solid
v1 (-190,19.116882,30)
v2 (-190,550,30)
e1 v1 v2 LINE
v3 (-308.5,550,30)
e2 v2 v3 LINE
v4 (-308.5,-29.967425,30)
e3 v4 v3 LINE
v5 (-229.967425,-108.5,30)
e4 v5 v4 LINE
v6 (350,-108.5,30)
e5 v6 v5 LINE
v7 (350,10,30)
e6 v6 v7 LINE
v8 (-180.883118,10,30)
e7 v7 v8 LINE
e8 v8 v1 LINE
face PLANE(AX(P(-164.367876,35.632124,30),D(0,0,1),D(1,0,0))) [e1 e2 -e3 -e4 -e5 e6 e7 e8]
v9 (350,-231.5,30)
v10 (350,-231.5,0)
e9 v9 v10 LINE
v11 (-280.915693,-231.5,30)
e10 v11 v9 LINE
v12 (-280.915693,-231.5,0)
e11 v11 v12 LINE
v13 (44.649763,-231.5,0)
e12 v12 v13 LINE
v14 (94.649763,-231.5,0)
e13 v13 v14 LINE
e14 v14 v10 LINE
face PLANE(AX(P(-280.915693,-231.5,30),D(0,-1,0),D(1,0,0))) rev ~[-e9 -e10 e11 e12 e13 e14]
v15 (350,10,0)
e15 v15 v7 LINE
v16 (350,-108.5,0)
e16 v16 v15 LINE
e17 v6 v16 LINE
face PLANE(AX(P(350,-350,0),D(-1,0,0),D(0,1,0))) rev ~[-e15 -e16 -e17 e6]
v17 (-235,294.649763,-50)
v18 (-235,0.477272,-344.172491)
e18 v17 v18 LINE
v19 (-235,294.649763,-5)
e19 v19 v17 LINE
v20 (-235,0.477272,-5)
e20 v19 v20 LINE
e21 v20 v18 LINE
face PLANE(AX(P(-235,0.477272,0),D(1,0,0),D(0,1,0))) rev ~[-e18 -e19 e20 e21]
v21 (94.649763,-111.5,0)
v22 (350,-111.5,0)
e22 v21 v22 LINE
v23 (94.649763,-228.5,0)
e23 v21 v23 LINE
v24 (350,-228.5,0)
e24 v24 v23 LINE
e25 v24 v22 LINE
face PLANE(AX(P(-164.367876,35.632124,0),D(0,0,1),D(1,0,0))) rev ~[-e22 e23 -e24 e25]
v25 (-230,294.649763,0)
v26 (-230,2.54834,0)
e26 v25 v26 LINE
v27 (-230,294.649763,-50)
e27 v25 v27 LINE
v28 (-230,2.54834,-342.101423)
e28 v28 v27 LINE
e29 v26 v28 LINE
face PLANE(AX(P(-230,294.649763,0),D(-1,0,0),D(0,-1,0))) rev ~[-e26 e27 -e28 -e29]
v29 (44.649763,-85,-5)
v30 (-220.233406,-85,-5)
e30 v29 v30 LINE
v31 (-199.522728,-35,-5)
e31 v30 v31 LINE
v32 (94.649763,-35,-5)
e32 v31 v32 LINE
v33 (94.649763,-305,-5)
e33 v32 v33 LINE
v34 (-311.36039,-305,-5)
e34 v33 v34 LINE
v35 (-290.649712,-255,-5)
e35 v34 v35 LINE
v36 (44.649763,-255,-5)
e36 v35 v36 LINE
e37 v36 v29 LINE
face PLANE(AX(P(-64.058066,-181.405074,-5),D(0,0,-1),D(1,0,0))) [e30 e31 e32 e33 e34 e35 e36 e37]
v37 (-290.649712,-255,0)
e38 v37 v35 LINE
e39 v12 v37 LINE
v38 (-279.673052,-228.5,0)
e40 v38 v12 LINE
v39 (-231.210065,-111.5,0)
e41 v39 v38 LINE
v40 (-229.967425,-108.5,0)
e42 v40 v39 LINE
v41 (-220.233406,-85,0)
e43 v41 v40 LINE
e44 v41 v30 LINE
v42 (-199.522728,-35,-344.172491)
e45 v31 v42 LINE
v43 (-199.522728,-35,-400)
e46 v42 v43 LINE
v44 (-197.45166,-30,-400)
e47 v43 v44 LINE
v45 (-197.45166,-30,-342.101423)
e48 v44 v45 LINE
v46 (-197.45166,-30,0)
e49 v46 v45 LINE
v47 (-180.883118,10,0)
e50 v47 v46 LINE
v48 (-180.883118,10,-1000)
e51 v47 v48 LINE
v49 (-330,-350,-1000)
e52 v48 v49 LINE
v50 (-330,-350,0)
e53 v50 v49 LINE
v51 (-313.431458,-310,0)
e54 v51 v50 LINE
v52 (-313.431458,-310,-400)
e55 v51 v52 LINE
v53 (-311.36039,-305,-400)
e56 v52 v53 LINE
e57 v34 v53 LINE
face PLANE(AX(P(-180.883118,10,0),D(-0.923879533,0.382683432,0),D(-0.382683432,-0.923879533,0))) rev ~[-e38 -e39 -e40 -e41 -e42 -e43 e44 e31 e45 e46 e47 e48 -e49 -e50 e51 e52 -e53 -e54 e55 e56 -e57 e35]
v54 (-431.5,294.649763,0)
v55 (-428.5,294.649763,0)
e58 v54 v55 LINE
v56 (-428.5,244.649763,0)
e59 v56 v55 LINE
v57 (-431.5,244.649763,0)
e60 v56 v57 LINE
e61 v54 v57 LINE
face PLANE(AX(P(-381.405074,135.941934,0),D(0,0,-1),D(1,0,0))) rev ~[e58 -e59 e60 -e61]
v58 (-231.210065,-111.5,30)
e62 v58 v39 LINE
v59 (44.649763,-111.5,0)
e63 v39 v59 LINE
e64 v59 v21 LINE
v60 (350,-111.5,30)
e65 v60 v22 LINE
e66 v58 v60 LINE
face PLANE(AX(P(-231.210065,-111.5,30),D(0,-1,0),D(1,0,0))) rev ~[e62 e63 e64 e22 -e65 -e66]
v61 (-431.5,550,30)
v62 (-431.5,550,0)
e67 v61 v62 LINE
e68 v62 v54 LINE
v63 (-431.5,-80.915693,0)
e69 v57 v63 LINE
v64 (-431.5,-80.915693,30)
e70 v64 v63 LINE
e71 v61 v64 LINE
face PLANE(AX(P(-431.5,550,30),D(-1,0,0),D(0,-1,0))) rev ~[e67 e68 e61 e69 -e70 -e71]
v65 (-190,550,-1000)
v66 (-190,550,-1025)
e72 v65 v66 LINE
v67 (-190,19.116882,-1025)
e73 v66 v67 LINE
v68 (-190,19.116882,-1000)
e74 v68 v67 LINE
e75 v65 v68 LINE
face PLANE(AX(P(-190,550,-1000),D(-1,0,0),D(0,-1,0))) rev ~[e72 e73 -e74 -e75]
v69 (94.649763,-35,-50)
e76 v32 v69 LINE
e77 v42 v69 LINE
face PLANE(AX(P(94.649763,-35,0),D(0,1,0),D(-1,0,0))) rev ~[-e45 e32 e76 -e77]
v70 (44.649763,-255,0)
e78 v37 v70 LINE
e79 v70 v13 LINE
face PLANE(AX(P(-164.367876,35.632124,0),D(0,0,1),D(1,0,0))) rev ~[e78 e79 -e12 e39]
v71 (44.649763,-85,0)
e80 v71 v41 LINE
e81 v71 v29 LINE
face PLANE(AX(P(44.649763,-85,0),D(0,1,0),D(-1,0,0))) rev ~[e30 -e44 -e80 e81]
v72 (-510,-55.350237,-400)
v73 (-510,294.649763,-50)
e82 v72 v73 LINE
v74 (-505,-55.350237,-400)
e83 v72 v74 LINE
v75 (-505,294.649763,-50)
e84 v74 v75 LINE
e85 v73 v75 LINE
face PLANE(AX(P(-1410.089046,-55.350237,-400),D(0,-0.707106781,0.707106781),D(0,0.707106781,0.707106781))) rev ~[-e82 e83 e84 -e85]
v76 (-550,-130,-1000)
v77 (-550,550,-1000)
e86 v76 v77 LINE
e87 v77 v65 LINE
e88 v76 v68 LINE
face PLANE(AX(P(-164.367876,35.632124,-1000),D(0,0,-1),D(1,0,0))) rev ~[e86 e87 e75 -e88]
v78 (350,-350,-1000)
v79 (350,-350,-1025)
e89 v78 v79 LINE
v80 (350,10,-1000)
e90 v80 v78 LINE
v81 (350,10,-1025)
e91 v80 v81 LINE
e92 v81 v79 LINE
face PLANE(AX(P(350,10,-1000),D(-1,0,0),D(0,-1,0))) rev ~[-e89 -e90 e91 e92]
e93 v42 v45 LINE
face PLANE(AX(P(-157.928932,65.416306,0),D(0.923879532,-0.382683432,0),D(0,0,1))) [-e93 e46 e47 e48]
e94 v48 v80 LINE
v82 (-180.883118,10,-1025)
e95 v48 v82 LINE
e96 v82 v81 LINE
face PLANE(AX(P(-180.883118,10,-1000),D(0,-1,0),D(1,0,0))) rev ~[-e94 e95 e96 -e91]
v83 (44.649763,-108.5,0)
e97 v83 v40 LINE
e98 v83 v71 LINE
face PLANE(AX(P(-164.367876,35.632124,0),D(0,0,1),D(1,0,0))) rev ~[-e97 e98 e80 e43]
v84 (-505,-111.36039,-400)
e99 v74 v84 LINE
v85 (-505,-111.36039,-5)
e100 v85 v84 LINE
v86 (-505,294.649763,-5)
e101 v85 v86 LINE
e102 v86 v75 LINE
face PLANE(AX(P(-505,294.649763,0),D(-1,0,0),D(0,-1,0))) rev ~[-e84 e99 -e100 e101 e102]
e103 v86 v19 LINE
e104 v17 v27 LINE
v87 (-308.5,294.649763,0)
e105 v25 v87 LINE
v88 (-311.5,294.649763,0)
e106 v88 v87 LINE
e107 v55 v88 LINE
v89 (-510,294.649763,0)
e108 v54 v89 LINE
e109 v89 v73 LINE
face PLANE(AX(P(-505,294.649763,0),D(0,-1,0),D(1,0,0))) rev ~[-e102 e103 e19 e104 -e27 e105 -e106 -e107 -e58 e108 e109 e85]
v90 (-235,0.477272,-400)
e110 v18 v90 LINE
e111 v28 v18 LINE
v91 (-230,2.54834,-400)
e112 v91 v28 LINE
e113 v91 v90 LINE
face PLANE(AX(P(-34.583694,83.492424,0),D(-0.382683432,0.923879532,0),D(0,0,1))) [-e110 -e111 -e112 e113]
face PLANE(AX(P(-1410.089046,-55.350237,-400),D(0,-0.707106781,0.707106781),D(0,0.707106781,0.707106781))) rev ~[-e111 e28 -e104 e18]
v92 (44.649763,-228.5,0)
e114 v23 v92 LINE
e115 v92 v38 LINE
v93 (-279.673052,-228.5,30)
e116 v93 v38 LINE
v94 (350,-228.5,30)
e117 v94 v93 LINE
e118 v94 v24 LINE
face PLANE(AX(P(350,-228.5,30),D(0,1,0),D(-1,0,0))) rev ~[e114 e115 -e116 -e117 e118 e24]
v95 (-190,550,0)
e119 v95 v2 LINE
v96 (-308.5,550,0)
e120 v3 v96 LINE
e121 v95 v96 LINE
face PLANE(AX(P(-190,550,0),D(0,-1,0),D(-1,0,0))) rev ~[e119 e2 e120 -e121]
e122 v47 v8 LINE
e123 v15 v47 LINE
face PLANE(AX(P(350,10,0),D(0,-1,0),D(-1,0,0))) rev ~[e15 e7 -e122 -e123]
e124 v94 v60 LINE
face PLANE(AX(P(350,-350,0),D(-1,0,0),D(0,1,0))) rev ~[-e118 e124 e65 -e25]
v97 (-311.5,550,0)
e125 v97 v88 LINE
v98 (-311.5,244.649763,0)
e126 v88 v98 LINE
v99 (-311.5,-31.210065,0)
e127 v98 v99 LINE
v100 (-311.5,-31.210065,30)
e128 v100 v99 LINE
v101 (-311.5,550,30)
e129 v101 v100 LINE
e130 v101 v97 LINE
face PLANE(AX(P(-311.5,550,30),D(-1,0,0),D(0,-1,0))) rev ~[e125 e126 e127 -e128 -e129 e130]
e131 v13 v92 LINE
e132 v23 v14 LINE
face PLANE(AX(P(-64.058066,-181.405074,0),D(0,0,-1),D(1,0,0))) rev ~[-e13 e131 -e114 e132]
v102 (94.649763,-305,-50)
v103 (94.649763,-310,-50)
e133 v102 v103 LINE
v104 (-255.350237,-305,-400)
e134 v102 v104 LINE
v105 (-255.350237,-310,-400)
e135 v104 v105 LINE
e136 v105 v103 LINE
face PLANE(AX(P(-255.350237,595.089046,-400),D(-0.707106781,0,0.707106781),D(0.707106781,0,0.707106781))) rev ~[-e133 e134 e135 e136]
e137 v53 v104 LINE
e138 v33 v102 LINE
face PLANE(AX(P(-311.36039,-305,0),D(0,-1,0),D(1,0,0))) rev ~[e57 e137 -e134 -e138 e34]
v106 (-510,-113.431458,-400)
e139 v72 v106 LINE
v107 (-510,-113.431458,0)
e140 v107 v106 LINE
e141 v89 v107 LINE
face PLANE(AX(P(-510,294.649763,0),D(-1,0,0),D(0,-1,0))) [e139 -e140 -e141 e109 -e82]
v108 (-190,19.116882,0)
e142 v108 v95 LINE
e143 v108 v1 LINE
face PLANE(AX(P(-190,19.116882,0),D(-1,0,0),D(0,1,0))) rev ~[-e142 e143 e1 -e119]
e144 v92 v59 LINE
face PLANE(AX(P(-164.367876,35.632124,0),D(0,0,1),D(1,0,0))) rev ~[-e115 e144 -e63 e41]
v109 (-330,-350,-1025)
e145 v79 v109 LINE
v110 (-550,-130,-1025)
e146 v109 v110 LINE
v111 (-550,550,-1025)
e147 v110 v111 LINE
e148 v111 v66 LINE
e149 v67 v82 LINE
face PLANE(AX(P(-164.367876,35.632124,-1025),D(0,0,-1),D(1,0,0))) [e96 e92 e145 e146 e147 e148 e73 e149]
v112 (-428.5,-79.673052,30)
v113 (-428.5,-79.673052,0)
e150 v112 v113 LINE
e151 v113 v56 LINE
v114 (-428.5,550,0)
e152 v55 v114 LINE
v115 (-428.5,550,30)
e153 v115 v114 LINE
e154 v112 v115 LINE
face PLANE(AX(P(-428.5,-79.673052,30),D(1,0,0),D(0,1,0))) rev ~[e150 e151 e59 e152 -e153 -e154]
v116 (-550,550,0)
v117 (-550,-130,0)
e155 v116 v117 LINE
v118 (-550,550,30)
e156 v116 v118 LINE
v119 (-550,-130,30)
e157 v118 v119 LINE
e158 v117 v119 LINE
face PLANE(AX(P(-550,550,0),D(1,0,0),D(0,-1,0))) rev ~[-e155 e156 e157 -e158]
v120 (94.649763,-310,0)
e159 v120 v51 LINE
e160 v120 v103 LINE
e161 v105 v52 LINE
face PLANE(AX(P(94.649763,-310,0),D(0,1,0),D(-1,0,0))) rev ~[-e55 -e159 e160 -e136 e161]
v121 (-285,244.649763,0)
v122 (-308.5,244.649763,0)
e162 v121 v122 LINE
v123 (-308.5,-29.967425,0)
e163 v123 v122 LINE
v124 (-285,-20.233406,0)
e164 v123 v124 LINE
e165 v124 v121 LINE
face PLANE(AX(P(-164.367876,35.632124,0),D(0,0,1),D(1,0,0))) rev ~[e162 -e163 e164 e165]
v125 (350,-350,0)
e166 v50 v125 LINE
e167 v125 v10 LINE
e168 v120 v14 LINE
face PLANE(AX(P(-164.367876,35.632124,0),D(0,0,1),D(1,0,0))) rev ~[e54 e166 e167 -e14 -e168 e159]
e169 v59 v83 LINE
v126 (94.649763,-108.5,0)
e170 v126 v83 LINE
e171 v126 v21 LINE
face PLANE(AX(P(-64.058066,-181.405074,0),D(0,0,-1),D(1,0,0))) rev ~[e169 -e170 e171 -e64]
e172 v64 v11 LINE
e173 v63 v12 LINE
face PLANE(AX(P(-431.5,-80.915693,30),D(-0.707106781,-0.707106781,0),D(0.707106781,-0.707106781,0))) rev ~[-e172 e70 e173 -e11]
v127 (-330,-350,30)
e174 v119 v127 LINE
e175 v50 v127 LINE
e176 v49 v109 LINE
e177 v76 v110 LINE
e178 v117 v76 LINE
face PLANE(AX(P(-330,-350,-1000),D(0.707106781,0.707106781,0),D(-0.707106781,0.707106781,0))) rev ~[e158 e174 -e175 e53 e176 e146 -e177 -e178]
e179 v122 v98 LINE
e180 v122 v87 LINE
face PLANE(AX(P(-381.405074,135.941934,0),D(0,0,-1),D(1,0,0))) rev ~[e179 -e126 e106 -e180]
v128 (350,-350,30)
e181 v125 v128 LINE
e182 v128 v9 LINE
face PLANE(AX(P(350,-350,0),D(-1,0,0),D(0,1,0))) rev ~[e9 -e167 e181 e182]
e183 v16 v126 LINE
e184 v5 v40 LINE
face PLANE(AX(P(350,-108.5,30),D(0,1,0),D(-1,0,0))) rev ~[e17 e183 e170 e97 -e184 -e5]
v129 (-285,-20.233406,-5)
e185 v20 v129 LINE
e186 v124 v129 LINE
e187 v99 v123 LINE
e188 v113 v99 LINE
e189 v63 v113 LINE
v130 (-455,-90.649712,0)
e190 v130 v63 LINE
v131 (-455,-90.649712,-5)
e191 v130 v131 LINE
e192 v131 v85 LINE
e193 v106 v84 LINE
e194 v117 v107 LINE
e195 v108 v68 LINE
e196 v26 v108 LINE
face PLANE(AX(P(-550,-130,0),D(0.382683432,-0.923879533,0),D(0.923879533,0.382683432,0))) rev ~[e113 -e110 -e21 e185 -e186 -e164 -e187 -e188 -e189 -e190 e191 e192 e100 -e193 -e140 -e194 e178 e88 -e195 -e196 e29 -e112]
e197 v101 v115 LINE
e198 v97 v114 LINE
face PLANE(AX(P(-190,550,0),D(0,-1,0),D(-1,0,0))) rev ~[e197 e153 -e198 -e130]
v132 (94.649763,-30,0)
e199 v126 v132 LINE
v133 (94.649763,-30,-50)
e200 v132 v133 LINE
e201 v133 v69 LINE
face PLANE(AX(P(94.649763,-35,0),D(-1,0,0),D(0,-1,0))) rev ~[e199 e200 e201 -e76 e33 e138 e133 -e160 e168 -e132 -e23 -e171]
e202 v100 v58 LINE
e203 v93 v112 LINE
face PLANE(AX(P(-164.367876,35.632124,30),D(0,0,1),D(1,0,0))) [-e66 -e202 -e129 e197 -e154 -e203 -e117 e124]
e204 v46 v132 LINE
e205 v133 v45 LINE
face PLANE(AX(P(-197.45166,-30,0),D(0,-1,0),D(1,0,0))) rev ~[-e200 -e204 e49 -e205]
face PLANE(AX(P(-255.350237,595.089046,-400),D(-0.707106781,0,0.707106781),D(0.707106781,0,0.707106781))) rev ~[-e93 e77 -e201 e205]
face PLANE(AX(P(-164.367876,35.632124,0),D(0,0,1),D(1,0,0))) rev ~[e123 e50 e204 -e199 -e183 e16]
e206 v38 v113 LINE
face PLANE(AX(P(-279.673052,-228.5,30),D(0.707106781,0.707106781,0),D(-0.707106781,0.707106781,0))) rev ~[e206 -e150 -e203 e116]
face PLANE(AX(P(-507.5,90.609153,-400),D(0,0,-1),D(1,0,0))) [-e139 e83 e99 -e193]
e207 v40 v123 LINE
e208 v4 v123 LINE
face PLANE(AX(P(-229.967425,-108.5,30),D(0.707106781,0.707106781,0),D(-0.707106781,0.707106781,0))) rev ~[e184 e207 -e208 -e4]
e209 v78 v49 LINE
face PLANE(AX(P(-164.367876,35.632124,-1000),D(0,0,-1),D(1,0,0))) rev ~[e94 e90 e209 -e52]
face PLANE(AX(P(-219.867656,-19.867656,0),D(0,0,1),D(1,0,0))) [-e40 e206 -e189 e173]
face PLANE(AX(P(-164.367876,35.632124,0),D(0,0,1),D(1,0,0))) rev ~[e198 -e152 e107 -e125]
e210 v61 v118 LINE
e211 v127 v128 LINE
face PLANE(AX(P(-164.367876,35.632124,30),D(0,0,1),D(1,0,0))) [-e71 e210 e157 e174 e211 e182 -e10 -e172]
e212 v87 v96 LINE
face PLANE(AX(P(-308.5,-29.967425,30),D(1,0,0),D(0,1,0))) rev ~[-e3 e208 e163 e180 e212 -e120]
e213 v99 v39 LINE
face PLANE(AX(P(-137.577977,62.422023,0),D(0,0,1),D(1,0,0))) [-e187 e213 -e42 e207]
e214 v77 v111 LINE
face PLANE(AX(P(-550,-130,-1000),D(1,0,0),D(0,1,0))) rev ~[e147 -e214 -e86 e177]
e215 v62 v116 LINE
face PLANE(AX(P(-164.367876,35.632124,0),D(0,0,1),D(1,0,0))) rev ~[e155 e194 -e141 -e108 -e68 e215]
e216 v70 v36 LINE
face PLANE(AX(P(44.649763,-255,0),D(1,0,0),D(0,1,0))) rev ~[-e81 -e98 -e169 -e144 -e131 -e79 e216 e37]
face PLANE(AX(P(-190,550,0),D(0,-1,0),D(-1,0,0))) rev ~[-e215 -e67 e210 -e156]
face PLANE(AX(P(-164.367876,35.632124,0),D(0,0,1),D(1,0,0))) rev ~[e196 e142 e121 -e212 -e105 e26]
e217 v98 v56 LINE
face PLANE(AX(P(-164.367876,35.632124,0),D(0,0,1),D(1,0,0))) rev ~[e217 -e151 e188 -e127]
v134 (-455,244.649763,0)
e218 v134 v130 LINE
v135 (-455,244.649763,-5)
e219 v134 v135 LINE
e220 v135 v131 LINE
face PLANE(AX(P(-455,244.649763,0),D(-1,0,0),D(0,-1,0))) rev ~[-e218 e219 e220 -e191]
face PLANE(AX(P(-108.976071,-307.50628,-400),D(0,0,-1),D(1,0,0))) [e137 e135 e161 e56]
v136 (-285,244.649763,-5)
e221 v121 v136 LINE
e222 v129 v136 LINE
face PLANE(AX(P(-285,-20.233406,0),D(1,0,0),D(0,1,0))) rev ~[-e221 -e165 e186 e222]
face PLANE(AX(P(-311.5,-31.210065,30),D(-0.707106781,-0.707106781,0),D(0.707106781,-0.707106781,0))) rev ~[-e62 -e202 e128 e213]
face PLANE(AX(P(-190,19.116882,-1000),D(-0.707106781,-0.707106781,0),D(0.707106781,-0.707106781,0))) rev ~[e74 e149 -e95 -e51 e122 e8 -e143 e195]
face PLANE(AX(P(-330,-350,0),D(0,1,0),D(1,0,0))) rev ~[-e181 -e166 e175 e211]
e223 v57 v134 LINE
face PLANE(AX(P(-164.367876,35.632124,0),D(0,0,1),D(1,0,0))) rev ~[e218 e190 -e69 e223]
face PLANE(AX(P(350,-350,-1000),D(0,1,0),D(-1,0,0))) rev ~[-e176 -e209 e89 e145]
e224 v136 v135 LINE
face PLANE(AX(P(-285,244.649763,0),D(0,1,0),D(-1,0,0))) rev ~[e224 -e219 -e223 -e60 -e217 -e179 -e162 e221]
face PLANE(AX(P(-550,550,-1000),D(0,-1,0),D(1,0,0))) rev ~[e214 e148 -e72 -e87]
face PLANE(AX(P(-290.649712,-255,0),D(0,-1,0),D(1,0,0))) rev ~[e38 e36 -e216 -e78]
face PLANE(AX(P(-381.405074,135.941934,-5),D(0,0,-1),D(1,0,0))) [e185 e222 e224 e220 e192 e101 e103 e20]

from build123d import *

# Parameters (mm, degrees)
F1_DEPTH     = 30
F3_DEPTH     = 1000
F5_DEPTH     = 25
F6_W         = 5
F6_H         = 408.0812203564
F7_DEPTH     = 400
F8_T4_DEPTH  = 1805.1780915761
F8_T10_DEPTH = 1805.1780915761
F8_T16_DEPTH = 1805.1780915761
F8_T22_DEPTH = 1805.1780915761
F8_T28_DEPTH = 1805.1780915761
F8_T34_DEPTH = 1805.1780915761
F8_T40_DEPTH = 1805.1780915761
F8_T46_DEPTH = 1805.1780915761
F8_T52_DEPTH = 1805.1780915761
F8_T58_DEPTH = 1805.1780915761
F8_T64_DEPTH = 1805.1780915761
F8_T70_DEPTH = 1805.1780915761
F12_DEPTH    = 30
F13_DEPTH    = 5


# Not quite as in the source:
# - a fillet or chamfer that OpenCascade refuses, or shapes differently, is made with other operations: its cross-section is extruded or revolved along the edge and cut away or added


with BuildPart() as f1:
    # F0 (on Top) → F1 (new body)
    with BuildSketch(Plane.XY):
        Polygon((-190, 550), (-550, 550), (-550, -130), (-330, -350), (350, -350), (350, 10), (-180.8831175457, 10), (-190, 19.1168824543), align=None)
    extrude(amount=F1_DEPTH)

    # F2 (on face) → F3 (join)
    with BuildSketch(Plane(origin=(0, 0, 0), x_dir=(1, 0, 0), z_dir=(0, 0, -1))):
        Polygon((-330, 350), (-550, 130), (-190, -19.1168824543), (-180.8831175457, -10), align=None)
    extrude(amount=F3_DEPTH)

    # F4 (on face) → F5 (join)
    with BuildSketch(Plane(origin=(0, 0, -1000), x_dir=(1, 0, 0), z_dir=(0, 0, -1))):
        Polygon((350, 350), (-330, 350), (-550, 130), (-550, -550), (-190, -550), (-190, -19.1168824543), (-180.8831175457, -10), (350, -10), align=None)
    extrude(amount=F5_DEPTH)

    # F6 (on face) → F7 (join)
    with BuildSketch(Plane(origin=(0, 0, 0), x_dir=(1, 0, 0), z_dir=(0, 0, -1))):
        Polygon((-311.3603896932, 305), (94.6497628513, 305), (94.6497628513, 310), (-313.4314575051, 310), align=None)
        with Locations((-507.5, -90.6091526731)):
            Rectangle(F6_W, F6_H)
        Polygon((94.6497628513, 30), (94.6497628513, 35), (-199.5227278525, 35), (-197.4516600406, 30), align=None)
        Polygon((-235, -0.4772721475), (-235, -294.6497628513), (-230, -294.6497628513), (-230, -2.5483399594), align=None)
    extrude(amount=F7_DEPTH)

    # F8: chamfer of 350 on 4 edges, made by hand


with BuildPart() as f8_tool2:
    # F8_s3 → F8_t4 (new body)
    with BuildSketch(Plane.YZ.offset(-1410.0890457881)):
        Polygon((-55.3502371487, -400), (294.6497628513, -50), (294.6497628513, -400), align=None)
    extrude(amount=F8_T4_DEPTH)

    split(bisect_by=Plane(origin=(-34.5836943966, 83.4924240492, 0), x_dir=(0, 0, 1), z_dir=(-0.3826834324, 0.9238795325, 0)), keep=Keep.TOP)

    split(bisect_by=Plane(origin=(-157.9289321881, 65.4163056034, 0), x_dir=(0, 0, 1), z_dir=(-0.9238795325, 0.3826834324, 0)), keep=Keep.TOP)


with BuildPart() as f1_1:
    add(f1.part)

    # F8_t1: cut F8_tool2
    add(f8_tool2.part, mode=Mode.SUBTRACT)


with BuildPart() as f8_tool8:
    # F8_s9 → F8_t10 (new body)
    with BuildSketch(Plane.YZ.offset(-1410.0890457881)):
        Polygon((-55.3502371487, -400), (294.6497628513, -50), (294.6497628513, -400), align=None)
    extrude(amount=F8_T10_DEPTH)

    split(bisect_by=Plane(origin=(-34.5836943966, 83.4924240492, 0), x_dir=(0, 0, 1), z_dir=(-0.3826834324, 0.9238795325, 0)), keep=Keep.TOP)

    split(bisect_by=Plane(origin=(-157.9289321881, 65.4163056034, 0), x_dir=(0, 0, 1), z_dir=(0.9238795325, -0.3826834324, 0)), keep=Keep.TOP)


with BuildPart() as f1_2:
    add(f1_1.part)

    # F8_t7: cut F8_tool8
    add(f8_tool8.part, mode=Mode.SUBTRACT)


with BuildPart() as f8_tool14:
    # F8_s15 → F8_t16 (new body)
    with BuildSketch(Plane.YZ.offset(-1410.0890457881)):
        Polygon((-55.3502371487, -400), (294.6497628513, -50), (294.6497628513, -400), align=None)
    extrude(amount=F8_T16_DEPTH)

    split(bisect_by=Plane(origin=(-34.5836943966, 83.4924240492, 0), x_dir=(0, 0, 1), z_dir=(0.3826834324, -0.9238795325, 0)), keep=Keep.TOP)

    split(bisect_by=Plane(origin=(-157.9289321881, 65.4163056034, 0), x_dir=(0, 0, 1), z_dir=(0.9238795325, -0.3826834324, 0)), keep=Keep.TOP)


with BuildPart() as f1_3:
    add(f1_2.part)

    # F8_t13: cut F8_tool14
    add(f8_tool14.part, mode=Mode.SUBTRACT)


with BuildPart() as f8_tool20:
    # F8_s21 → F8_t22 (new body)
    with BuildSketch(Plane.XZ.offset(-595.0890457881)):
        Polygon((-255.3502371487, -400), (94.6497628513, -50), (94.6497628513, -400), align=None)
    extrude(amount=F8_T22_DEPTH)

    split(bisect_by=Plane(origin=(-34.5836943966, 83.4924240492, 0), x_dir=(0, 0, 1), z_dir=(-0.3826834324, 0.9238795325, 0)), keep=Keep.TOP)

    split(bisect_by=Plane(origin=(-157.9289321881, 65.4163056034, 0), x_dir=(0, 0, 1), z_dir=(-0.9238795325, 0.3826834324, 0)), keep=Keep.TOP)


with BuildPart() as f1_4:
    add(f1_3.part)

    # F8_t19: cut F8_tool20
    add(f8_tool20.part, mode=Mode.SUBTRACT)


with BuildPart() as f8_tool26:
    # F8_s27 → F8_t28 (new body)
    with BuildSketch(Plane.XZ.offset(-595.0890457881)):
        Polygon((-255.3502371487, -400), (94.6497628513, -50), (94.6497628513, -400), align=None)
    extrude(amount=F8_T28_DEPTH)

    split(bisect_by=Plane(origin=(-34.5836943966, 83.4924240492, 0), x_dir=(0, 0, 1), z_dir=(-0.3826834324, 0.9238795325, 0)), keep=Keep.TOP)

    split(bisect_by=Plane(origin=(-157.9289321881, 65.4163056034, 0), x_dir=(0, 0, 1), z_dir=(0.9238795325, -0.3826834324, 0)), keep=Keep.TOP)


with BuildPart() as f1_5:
    add(f1_4.part)

    # F8_t25: cut F8_tool26
    add(f8_tool26.part, mode=Mode.SUBTRACT)


with BuildPart() as f8_tool32:
    # F8_s33 → F8_t34 (new body)
    with BuildSketch(Plane.XZ.offset(-595.0890457881)):
        Polygon((-255.3502371487, -400), (94.6497628513, -50), (94.6497628513, -400), align=None)
    extrude(amount=F8_T34_DEPTH)

    split(bisect_by=Plane(origin=(-34.5836943966, 83.4924240492, 0), x_dir=(0, 0, 1), z_dir=(0.3826834324, -0.9238795325, 0)), keep=Keep.TOP)

    split(bisect_by=Plane(origin=(-157.9289321881, 65.4163056034, 0), x_dir=(0, 0, 1), z_dir=(0.9238795325, -0.3826834324, 0)), keep=Keep.TOP)


with BuildPart() as f1_6:
    add(f1_5.part)

    # F8_t31: cut F8_tool32
    add(f8_tool32.part, mode=Mode.SUBTRACT)


with BuildPart() as f8_tool38:
    # F8_s39 → F8_t40 (new body)
    with BuildSketch(Plane.YZ.offset(-1135.0890457881)):
        Polygon((-55.3502371487, -400), (294.6497628513, -50), (294.6497628513, -400), align=None)
    extrude(amount=F8_T40_DEPTH)

    split(bisect_by=Plane(origin=(-34.5836943966, 83.4924240492, 0), x_dir=(0, 0, 1), z_dir=(-0.3826834324, 0.9238795325, 0)), keep=Keep.TOP)

    split(bisect_by=Plane(origin=(-157.9289321881, 65.4163056034, 0), x_dir=(0, 0, 1), z_dir=(-0.9238795325, 0.3826834324, 0)), keep=Keep.TOP)


with BuildPart() as f1_7:
    add(f1_6.part)

    # F8_t37: cut F8_tool38
    add(f8_tool38.part, mode=Mode.SUBTRACT)


with BuildPart() as f8_tool44:
    # F8_s45 → F8_t46 (new body)
    with BuildSketch(Plane.YZ.offset(-1135.0890457881)):
        Polygon((-55.3502371487, -400), (294.6497628513, -50), (294.6497628513, -400), align=None)
    extrude(amount=F8_T46_DEPTH)

    split(bisect_by=Plane(origin=(-34.5836943966, 83.4924240492, 0), x_dir=(0, 0, 1), z_dir=(-0.3826834324, 0.9238795325, 0)), keep=Keep.TOP)

    split(bisect_by=Plane(origin=(-157.9289321881, 65.4163056034, 0), x_dir=(0, 0, 1), z_dir=(0.9238795325, -0.3826834324, 0)), keep=Keep.TOP)


with BuildPart() as f1_8:
    add(f1_7.part)

    # F8_t43: cut F8_tool44
    add(f8_tool44.part, mode=Mode.SUBTRACT)


with BuildPart() as f8_tool50:
    # F8_s51 → F8_t52 (new body)
    with BuildSketch(Plane.YZ.offset(-1135.0890457881)):
        Polygon((-55.3502371487, -400), (294.6497628513, -50), (294.6497628513, -400), align=None)
    extrude(amount=F8_T52_DEPTH)

    split(bisect_by=Plane(origin=(-34.5836943966, 83.4924240492, 0), x_dir=(0, 0, 1), z_dir=(0.3826834324, -0.9238795325, 0)), keep=Keep.TOP)

    split(bisect_by=Plane(origin=(-157.9289321881, 65.4163056034, 0), x_dir=(0, 0, 1), z_dir=(0.9238795325, -0.3826834324, 0)), keep=Keep.TOP)


with BuildPart() as f1_9:
    add(f1_8.part)

    # F8_t49: cut F8_tool50
    add(f8_tool50.part, mode=Mode.SUBTRACT)


with BuildPart() as f8_tool56:
    # F8_s57 → F8_t58 (new body)
    with BuildSketch(Plane.XZ.offset(-870.0890457881)):
        Polygon((-255.3502371487, -400), (94.6497628513, -50), (94.6497628513, -400), align=None)
    extrude(amount=F8_T58_DEPTH)

    split(bisect_by=Plane(origin=(-34.5836943966, 83.4924240492, 0), x_dir=(0, 0, 1), z_dir=(-0.3826834324, 0.9238795325, 0)), keep=Keep.TOP)

    split(bisect_by=Plane(origin=(-157.9289321881, 65.4163056034, 0), x_dir=(0, 0, 1), z_dir=(-0.9238795325, 0.3826834324, 0)), keep=Keep.TOP)


with BuildPart() as f1_10:
    add(f1_9.part)

    # F8_t55: cut F8_tool56
    add(f8_tool56.part, mode=Mode.SUBTRACT)


with BuildPart() as f8_tool62:
    # F8_s63 → F8_t64 (new body)
    with BuildSketch(Plane.XZ.offset(-870.0890457881)):
        Polygon((-255.3502371487, -400), (94.6497628513, -50), (94.6497628513, -400), align=None)
    extrude(amount=F8_T64_DEPTH)

    split(bisect_by=Plane(origin=(-34.5836943966, 83.4924240492, 0), x_dir=(0, 0, 1), z_dir=(-0.3826834324, 0.9238795325, 0)), keep=Keep.TOP)

    split(bisect_by=Plane(origin=(-157.9289321881, 65.4163056034, 0), x_dir=(0, 0, 1), z_dir=(0.9238795325, -0.3826834324, 0)), keep=Keep.TOP)


with BuildPart() as f1_11:
    add(f1_10.part)

    # F8_t61: cut F8_tool62
    add(f8_tool62.part, mode=Mode.SUBTRACT)


with BuildPart() as f8_tool68:
    # F8_s69 → F8_t70 (new body)
    with BuildSketch(Plane.XZ.offset(-870.0890457881)):
        Polygon((-255.3502371487, -400), (94.6497628513, -50), (94.6497628513, -400), align=None)
    extrude(amount=F8_T70_DEPTH)

    split(bisect_by=Plane(origin=(-34.5836943966, 83.4924240492, 0), x_dir=(0, 0, 1), z_dir=(0.3826834324, -0.9238795325, 0)), keep=Keep.TOP)

    split(bisect_by=Plane(origin=(-157.9289321881, 65.4163056034, 0), x_dir=(0, 0, 1), z_dir=(0.9238795325, -0.3826834324, 0)), keep=Keep.TOP)


with BuildPart() as f1_12:
    add(f1_11.part)

    # F8_t67: cut F8_tool68
    add(f8_tool68.part, mode=Mode.SUBTRACT)

    # F11 (on face) → F12 (cut, through all)
    with BuildSketch(Plane.XY.offset(30)):
        Polygon((-431.5, -80.9156928588), (-280.9156928588, -231.5), (350, -231.5), (350, -228.5), (-279.6730521717, -228.5), (-428.5, -79.6730521717), (-428.5, 550), (-431.5, 550), align=None)
        Polygon((-311.5, -31.210065374), (-231.210065374, -111.5), (350, -111.5), (350, -108.5), (-229.9674246869, -108.5), (-308.5, -29.9674246869), (-308.5, 550), (-311.5, 550), align=None)
    extrude(amount=-F12_DEPTH, mode=Mode.SUBTRACT)

    # F9 (on face) → F13 (join)
    with BuildSketch(Plane(origin=(0, 0, 0), x_dir=(1, 0, 0), z_dir=(0, 0, -1))):
        Polygon((94.6497628513, 255), (94.6497628513, 305), (-311.3603896932, 305), (-290.6497115746, 255), (44.6497628513, 255), (44.6497628513, 85), (-220.2334059711, 85), (-199.5227278525, 35), (94.6497628513, 35), (94.6497628513, 85), align=None)
        Polygon((-285, -294.6497628513), (-235, -294.6497628513), (-235, -0.4772721475), (-285, 20.2334059711), (-285, -244.6497628513), (-455, -244.6497628513), (-455, 90.6497115746), (-505, 111.3603896932), (-505, -294.6497628513), (-455, -294.6497628513), align=None)
    extrude(amount=F13_DEPTH)


solid = f1_12.part
